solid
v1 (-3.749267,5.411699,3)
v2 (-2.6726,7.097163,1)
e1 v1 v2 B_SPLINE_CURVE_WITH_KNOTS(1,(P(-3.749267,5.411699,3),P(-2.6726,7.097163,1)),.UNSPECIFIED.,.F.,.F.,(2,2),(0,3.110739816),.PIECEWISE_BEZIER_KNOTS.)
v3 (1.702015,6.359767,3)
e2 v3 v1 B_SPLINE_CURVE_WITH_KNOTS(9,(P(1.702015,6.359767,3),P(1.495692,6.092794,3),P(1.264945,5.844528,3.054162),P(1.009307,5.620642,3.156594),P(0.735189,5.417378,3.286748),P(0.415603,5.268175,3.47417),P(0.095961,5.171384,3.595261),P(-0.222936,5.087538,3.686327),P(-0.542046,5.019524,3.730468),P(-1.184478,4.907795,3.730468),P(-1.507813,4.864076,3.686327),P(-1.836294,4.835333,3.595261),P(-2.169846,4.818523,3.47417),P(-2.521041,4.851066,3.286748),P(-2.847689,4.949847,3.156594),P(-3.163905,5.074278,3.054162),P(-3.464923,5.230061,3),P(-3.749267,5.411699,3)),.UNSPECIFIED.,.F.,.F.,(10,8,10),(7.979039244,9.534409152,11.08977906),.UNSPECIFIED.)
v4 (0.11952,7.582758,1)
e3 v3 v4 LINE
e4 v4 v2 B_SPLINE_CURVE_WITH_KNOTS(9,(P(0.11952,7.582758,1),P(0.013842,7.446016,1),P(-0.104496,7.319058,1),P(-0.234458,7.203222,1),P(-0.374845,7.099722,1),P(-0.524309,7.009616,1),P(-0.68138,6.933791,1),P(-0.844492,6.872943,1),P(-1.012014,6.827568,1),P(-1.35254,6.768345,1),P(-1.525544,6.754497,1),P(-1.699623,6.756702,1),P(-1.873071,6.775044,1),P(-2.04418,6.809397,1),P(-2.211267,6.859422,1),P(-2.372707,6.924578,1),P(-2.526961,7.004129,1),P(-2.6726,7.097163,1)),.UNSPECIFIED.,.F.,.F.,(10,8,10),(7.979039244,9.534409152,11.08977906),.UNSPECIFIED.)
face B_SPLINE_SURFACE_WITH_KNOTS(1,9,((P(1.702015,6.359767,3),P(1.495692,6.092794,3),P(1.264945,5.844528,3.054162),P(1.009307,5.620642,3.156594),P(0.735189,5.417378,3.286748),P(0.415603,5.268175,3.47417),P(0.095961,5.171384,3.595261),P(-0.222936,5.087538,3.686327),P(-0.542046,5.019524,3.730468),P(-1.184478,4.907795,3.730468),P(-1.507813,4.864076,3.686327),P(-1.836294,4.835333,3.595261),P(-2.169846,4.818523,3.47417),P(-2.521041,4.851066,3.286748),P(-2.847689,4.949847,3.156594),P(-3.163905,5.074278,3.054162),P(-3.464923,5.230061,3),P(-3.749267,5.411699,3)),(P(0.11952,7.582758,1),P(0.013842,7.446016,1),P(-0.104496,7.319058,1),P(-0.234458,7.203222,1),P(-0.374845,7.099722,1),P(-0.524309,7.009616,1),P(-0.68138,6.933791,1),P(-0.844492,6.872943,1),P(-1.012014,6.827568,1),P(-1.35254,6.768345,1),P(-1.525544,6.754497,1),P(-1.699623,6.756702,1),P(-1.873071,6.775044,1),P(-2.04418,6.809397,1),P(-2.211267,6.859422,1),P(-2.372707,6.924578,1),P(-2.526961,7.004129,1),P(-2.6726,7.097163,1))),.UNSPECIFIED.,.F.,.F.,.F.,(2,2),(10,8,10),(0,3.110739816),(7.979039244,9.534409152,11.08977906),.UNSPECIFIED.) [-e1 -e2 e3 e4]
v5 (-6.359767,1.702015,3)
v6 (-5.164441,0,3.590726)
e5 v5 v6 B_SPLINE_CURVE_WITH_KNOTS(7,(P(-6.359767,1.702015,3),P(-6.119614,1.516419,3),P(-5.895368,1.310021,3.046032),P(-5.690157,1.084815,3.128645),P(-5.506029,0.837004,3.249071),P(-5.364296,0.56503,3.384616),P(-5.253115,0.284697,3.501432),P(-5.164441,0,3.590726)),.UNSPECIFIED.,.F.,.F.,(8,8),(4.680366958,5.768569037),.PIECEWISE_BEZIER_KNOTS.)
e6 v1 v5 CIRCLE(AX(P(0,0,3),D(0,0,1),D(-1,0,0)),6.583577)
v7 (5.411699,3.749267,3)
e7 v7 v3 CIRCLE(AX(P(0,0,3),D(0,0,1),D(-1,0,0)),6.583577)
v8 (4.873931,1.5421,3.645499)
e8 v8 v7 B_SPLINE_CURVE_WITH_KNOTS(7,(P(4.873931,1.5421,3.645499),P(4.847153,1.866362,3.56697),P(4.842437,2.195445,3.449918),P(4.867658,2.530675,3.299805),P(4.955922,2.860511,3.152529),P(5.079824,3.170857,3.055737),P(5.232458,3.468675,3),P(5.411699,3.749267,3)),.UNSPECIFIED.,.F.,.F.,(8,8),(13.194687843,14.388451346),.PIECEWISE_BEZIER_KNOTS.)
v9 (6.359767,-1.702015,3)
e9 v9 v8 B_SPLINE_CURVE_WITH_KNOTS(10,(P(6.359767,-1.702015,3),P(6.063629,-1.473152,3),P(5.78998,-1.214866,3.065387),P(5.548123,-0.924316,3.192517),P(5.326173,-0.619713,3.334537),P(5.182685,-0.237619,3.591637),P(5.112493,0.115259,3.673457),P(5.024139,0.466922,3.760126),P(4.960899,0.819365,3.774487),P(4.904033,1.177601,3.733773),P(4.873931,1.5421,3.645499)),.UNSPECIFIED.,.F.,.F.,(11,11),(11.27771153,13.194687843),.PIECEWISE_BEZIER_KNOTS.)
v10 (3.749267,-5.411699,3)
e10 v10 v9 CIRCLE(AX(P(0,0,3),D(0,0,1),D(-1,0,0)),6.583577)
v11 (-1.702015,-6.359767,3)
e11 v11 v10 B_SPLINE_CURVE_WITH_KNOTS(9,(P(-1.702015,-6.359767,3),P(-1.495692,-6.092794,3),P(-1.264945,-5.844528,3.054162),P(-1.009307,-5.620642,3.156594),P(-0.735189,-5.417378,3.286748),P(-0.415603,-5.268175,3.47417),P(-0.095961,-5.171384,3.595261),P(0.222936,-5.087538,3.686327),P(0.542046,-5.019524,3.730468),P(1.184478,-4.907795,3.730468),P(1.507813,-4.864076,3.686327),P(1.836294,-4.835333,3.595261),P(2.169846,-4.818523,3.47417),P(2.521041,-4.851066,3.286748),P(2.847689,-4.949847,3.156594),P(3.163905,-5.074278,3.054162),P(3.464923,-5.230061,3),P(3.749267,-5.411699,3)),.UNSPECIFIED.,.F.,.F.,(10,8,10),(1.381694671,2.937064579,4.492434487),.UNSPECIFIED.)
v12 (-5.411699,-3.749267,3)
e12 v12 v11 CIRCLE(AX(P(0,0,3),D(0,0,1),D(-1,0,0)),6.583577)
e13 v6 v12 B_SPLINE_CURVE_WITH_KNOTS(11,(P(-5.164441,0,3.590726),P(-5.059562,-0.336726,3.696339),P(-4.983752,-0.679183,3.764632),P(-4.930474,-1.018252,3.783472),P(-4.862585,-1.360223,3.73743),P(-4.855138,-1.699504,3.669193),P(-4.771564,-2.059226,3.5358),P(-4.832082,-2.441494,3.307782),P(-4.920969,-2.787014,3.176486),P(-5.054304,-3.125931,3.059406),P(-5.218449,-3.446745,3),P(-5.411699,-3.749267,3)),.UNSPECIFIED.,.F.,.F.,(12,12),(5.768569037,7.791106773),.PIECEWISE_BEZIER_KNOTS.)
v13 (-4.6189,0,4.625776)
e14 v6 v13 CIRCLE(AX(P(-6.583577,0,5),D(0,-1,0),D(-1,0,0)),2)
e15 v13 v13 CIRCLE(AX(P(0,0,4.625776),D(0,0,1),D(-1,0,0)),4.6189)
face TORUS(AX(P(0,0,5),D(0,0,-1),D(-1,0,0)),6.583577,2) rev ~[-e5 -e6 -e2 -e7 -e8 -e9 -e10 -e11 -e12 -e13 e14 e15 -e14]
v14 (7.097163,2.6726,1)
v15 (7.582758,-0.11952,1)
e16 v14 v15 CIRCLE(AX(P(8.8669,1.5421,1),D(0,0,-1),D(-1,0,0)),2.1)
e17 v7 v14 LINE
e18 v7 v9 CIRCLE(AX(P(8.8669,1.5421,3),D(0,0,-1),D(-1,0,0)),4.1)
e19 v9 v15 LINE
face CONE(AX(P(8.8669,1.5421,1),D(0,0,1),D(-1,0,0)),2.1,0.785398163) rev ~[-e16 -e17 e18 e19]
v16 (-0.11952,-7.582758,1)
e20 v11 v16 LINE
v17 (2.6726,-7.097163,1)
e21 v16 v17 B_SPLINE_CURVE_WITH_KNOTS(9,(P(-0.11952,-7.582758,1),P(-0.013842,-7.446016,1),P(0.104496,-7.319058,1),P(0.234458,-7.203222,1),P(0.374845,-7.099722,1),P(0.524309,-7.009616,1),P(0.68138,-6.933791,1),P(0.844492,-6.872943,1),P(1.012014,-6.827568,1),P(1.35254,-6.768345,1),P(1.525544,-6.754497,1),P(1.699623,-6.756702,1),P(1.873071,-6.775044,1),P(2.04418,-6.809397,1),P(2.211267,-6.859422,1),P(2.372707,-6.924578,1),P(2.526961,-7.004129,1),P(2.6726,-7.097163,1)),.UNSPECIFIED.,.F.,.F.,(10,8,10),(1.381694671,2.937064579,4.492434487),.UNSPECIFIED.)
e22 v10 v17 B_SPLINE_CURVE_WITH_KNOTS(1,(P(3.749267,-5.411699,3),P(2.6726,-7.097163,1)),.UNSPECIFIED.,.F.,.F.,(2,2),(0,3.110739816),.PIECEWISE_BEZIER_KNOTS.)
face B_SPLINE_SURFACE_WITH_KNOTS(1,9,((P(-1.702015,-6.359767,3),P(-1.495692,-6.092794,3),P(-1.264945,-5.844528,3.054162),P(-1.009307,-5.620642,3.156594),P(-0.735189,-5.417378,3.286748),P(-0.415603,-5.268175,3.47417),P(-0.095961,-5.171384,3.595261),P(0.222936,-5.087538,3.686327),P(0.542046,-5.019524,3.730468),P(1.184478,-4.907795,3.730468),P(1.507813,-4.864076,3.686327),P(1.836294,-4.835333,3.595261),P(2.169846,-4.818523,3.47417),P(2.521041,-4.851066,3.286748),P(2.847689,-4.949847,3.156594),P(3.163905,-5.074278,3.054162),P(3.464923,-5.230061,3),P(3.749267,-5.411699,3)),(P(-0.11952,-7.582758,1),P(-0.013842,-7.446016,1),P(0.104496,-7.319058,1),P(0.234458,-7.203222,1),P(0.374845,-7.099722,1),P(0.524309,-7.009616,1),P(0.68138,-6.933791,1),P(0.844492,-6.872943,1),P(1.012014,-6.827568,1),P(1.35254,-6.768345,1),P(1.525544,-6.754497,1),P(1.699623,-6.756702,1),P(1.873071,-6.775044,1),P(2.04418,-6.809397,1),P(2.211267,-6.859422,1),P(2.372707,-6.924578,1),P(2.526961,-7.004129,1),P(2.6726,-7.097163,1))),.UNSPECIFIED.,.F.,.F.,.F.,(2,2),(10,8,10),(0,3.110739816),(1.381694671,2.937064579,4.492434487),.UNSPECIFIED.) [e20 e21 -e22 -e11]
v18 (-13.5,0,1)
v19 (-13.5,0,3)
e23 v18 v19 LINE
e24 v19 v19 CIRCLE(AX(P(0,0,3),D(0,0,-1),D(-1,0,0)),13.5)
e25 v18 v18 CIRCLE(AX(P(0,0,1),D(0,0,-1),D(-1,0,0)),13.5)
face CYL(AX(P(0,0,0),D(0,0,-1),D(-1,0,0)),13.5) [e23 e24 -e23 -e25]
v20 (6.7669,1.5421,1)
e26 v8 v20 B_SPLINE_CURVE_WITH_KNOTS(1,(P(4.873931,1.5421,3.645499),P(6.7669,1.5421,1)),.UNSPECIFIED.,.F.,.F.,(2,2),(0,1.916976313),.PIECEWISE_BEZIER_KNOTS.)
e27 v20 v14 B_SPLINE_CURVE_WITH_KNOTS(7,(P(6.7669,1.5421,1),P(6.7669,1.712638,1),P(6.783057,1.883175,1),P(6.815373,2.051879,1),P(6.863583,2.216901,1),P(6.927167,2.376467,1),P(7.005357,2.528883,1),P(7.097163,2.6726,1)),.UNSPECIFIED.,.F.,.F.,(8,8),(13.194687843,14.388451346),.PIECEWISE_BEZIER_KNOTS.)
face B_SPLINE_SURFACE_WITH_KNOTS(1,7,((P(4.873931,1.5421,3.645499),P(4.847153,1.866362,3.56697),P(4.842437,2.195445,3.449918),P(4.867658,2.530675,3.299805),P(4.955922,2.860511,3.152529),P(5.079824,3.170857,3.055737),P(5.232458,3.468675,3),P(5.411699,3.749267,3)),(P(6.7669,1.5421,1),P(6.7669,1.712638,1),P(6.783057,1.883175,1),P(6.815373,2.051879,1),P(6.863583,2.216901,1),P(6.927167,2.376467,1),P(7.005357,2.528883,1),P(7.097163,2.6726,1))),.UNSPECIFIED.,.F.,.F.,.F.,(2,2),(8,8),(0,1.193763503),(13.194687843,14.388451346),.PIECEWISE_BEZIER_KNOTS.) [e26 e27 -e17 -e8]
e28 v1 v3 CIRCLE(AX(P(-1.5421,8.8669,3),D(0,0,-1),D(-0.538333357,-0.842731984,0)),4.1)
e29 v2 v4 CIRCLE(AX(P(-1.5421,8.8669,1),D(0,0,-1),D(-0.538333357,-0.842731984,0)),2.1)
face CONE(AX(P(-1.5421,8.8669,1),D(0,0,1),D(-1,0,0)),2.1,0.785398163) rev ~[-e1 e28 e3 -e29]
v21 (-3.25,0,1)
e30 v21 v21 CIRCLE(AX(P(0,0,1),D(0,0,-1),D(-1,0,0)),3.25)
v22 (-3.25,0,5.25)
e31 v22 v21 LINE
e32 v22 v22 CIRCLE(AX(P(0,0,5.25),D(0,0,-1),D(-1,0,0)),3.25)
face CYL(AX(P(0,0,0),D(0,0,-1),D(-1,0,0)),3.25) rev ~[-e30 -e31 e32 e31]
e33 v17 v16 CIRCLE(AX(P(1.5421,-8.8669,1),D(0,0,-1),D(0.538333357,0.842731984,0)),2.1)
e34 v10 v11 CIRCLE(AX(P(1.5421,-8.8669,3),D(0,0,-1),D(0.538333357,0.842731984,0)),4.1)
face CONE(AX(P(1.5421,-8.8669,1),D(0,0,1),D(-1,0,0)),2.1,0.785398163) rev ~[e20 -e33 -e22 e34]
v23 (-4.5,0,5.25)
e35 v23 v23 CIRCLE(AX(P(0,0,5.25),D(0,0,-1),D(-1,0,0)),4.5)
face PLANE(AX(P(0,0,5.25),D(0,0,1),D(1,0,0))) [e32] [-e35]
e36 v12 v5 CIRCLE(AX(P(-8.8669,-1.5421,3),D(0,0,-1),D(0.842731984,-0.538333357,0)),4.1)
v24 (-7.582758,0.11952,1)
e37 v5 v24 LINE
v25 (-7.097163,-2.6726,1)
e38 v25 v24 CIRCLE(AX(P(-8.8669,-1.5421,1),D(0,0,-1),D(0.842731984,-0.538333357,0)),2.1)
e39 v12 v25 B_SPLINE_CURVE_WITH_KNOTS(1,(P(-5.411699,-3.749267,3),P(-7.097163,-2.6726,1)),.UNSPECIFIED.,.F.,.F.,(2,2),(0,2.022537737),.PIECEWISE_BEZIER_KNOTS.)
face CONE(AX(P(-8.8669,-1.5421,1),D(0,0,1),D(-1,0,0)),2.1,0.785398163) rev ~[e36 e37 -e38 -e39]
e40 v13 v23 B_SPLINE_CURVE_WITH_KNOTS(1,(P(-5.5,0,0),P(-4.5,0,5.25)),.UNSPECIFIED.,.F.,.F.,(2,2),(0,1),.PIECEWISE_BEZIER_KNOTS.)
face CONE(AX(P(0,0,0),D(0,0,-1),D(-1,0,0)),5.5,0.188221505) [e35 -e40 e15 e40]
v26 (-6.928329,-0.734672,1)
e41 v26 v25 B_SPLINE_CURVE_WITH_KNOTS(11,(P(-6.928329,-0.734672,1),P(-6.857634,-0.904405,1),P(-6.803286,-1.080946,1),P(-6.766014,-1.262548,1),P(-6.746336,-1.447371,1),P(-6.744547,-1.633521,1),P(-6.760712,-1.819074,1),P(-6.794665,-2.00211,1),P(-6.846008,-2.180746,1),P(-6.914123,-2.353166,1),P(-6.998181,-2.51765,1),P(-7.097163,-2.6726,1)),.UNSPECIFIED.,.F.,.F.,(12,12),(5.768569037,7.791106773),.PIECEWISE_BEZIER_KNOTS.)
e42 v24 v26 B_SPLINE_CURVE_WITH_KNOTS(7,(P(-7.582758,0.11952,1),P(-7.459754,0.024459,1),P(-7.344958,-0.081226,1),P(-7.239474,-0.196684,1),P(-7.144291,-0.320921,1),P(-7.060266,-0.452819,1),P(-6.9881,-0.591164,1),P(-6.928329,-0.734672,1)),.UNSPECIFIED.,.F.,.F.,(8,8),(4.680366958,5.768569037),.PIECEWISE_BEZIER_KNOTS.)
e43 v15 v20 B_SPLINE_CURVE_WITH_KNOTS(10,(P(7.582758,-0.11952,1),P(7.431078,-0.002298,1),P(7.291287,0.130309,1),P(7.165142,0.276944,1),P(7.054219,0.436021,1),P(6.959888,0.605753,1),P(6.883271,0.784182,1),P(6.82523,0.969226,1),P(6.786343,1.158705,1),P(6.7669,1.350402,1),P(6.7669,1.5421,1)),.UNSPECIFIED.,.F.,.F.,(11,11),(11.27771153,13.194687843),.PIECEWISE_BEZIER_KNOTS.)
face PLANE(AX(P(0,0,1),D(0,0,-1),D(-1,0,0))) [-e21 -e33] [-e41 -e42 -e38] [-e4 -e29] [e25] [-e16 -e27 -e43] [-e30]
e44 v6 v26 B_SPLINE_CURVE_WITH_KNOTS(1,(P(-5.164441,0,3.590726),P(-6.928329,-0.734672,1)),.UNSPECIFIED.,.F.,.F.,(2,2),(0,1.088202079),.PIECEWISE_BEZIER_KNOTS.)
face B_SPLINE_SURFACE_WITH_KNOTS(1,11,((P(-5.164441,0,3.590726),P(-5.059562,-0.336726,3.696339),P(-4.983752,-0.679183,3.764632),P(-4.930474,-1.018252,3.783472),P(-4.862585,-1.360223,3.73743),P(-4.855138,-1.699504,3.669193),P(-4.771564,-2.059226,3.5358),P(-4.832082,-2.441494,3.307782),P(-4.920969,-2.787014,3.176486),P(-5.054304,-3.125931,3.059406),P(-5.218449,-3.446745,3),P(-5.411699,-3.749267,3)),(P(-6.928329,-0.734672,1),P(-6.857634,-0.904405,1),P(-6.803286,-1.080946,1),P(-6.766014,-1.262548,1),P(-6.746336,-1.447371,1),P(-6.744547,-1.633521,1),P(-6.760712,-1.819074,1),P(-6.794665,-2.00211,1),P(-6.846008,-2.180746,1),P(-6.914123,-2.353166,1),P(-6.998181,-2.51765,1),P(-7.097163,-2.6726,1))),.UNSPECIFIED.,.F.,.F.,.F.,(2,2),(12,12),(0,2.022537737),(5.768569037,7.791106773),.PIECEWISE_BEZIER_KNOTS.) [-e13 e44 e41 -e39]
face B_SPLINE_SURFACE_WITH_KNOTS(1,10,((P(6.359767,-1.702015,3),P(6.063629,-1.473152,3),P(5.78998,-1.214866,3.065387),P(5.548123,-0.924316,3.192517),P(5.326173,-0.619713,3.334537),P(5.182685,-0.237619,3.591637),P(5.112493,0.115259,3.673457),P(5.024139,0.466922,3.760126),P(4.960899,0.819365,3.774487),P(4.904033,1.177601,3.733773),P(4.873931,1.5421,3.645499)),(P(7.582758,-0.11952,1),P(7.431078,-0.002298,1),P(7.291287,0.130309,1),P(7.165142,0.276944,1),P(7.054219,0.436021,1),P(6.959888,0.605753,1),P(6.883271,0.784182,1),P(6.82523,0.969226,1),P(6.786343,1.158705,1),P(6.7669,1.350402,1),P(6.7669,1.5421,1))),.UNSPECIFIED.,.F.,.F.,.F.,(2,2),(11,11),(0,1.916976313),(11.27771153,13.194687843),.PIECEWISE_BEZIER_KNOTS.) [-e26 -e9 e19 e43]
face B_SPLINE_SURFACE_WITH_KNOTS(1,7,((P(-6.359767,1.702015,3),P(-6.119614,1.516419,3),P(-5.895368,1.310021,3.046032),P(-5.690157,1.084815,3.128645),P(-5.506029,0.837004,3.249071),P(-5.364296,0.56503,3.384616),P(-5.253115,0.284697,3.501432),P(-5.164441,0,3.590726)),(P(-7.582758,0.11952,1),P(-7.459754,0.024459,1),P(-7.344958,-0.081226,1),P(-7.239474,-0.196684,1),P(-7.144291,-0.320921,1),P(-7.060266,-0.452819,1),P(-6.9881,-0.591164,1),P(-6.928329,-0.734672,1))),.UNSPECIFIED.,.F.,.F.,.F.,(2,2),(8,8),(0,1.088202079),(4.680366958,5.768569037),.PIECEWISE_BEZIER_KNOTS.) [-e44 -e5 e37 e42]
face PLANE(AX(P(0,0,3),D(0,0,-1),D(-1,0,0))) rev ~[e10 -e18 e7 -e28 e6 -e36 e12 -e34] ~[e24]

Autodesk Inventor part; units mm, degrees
ref_plane "YZ Plane" through (0, 0, 0) normal (1, 0, 0) x (0, 1, 0)
ref_plane "XZ Plane" through (0, 0, 0) normal (0, 1, 0) x (-1, 0, 0)
ref_plane "XY Plane" through (0, 0, 0) normal (0, 0, 1) x (1, 0, 0)
sketch "Эскиз1" plane through (0, 0, 0) normal (0, 0, 1) x (1, 0, 0)
  circle A0 centre (0, 0) radius 3.25
  circle A1 centre (0, 0) radius 4.5
  dimension "d0" = 6.5
  dimension "d1" = 9
extrude "Выдавливание1" add sketch "Эскиз1" along normal blind 5.25
sketch "Эскиз2" plane through (0, 0, 0) normal (0, 0, -1) x (-1, 0, 0)
  circle A0 centre (0, 0) radius 5.5
  dimension "d4" = 11
loft "Лофт1" add profiles "Эскиз2" section 2 edges at (-4.5, 0, 5.25)
sketch "Эскиз4" plane through (0, 0, 0) normal (0, 0, -1) x (-1, 0, 0)
  circle A0 centre (0, 0) radius 3.25
  dimension "d10" = 6.5
extrude "Выдавливание2" cut sketch "Эскиз4" against normal through all
sketch "Эскиз5" plane through (0, 0, 0) normal (0, 0, -1) x (-1, 0, 0)
  circle A0 centre (-8.8669, 1.5421) radius 2.1 projected
  circle A1 centre (-1.5421, -8.8669) radius 2.1 projected
  circle A2 centre (1.5421, 8.8669) radius 2.1 projected
  circle A3 centre (8.8669, -1.5421) radius 2.1 projected
  circle A4 centre (0, 0) radius 13.5
  circle A5 centre (0, 0) radius 3.25 projected
  dimension "d13" = 27
extrude "Выдавливание3" add sketch "Эскиз5" against normal blind 3
fillet "Сопряжение1" radius 2 1 edges at (4.9286, 0, 3)
chamfer "Фаска1" distance 2 angle 45 4 edges at (0.5579, 8.8669, 3) (10.9669, 1.5421, 3) (-6.7669, -1.5421, 3) (3.6421, -8.8669, 3)
sketch "Эскиз6" plane through (0, 0, 0) normal (0, 0, -1) x (-1, 0, 0)
  circle A0 centre (0, 0) radius 13.5 projected
  circle A1 centre (8.8669, -1.5421) radius 2.1 projected
  circle A2 centre (1.5421, 8.8669) radius 2.1 projected
  circle A3 centre (-1.5421, -8.8669) radius 2.1 projected
  circle A4 centre (-8.8669, 1.5421) radius 2.1 projected
  circle A5 centre (0, 0) radius 3.25 projected
extrude "Выдавливание4" cut sketch "Эскиз6" against normal blind 1
properties part number "втулка для крепл 2" material "Пластик ПЭТ"
